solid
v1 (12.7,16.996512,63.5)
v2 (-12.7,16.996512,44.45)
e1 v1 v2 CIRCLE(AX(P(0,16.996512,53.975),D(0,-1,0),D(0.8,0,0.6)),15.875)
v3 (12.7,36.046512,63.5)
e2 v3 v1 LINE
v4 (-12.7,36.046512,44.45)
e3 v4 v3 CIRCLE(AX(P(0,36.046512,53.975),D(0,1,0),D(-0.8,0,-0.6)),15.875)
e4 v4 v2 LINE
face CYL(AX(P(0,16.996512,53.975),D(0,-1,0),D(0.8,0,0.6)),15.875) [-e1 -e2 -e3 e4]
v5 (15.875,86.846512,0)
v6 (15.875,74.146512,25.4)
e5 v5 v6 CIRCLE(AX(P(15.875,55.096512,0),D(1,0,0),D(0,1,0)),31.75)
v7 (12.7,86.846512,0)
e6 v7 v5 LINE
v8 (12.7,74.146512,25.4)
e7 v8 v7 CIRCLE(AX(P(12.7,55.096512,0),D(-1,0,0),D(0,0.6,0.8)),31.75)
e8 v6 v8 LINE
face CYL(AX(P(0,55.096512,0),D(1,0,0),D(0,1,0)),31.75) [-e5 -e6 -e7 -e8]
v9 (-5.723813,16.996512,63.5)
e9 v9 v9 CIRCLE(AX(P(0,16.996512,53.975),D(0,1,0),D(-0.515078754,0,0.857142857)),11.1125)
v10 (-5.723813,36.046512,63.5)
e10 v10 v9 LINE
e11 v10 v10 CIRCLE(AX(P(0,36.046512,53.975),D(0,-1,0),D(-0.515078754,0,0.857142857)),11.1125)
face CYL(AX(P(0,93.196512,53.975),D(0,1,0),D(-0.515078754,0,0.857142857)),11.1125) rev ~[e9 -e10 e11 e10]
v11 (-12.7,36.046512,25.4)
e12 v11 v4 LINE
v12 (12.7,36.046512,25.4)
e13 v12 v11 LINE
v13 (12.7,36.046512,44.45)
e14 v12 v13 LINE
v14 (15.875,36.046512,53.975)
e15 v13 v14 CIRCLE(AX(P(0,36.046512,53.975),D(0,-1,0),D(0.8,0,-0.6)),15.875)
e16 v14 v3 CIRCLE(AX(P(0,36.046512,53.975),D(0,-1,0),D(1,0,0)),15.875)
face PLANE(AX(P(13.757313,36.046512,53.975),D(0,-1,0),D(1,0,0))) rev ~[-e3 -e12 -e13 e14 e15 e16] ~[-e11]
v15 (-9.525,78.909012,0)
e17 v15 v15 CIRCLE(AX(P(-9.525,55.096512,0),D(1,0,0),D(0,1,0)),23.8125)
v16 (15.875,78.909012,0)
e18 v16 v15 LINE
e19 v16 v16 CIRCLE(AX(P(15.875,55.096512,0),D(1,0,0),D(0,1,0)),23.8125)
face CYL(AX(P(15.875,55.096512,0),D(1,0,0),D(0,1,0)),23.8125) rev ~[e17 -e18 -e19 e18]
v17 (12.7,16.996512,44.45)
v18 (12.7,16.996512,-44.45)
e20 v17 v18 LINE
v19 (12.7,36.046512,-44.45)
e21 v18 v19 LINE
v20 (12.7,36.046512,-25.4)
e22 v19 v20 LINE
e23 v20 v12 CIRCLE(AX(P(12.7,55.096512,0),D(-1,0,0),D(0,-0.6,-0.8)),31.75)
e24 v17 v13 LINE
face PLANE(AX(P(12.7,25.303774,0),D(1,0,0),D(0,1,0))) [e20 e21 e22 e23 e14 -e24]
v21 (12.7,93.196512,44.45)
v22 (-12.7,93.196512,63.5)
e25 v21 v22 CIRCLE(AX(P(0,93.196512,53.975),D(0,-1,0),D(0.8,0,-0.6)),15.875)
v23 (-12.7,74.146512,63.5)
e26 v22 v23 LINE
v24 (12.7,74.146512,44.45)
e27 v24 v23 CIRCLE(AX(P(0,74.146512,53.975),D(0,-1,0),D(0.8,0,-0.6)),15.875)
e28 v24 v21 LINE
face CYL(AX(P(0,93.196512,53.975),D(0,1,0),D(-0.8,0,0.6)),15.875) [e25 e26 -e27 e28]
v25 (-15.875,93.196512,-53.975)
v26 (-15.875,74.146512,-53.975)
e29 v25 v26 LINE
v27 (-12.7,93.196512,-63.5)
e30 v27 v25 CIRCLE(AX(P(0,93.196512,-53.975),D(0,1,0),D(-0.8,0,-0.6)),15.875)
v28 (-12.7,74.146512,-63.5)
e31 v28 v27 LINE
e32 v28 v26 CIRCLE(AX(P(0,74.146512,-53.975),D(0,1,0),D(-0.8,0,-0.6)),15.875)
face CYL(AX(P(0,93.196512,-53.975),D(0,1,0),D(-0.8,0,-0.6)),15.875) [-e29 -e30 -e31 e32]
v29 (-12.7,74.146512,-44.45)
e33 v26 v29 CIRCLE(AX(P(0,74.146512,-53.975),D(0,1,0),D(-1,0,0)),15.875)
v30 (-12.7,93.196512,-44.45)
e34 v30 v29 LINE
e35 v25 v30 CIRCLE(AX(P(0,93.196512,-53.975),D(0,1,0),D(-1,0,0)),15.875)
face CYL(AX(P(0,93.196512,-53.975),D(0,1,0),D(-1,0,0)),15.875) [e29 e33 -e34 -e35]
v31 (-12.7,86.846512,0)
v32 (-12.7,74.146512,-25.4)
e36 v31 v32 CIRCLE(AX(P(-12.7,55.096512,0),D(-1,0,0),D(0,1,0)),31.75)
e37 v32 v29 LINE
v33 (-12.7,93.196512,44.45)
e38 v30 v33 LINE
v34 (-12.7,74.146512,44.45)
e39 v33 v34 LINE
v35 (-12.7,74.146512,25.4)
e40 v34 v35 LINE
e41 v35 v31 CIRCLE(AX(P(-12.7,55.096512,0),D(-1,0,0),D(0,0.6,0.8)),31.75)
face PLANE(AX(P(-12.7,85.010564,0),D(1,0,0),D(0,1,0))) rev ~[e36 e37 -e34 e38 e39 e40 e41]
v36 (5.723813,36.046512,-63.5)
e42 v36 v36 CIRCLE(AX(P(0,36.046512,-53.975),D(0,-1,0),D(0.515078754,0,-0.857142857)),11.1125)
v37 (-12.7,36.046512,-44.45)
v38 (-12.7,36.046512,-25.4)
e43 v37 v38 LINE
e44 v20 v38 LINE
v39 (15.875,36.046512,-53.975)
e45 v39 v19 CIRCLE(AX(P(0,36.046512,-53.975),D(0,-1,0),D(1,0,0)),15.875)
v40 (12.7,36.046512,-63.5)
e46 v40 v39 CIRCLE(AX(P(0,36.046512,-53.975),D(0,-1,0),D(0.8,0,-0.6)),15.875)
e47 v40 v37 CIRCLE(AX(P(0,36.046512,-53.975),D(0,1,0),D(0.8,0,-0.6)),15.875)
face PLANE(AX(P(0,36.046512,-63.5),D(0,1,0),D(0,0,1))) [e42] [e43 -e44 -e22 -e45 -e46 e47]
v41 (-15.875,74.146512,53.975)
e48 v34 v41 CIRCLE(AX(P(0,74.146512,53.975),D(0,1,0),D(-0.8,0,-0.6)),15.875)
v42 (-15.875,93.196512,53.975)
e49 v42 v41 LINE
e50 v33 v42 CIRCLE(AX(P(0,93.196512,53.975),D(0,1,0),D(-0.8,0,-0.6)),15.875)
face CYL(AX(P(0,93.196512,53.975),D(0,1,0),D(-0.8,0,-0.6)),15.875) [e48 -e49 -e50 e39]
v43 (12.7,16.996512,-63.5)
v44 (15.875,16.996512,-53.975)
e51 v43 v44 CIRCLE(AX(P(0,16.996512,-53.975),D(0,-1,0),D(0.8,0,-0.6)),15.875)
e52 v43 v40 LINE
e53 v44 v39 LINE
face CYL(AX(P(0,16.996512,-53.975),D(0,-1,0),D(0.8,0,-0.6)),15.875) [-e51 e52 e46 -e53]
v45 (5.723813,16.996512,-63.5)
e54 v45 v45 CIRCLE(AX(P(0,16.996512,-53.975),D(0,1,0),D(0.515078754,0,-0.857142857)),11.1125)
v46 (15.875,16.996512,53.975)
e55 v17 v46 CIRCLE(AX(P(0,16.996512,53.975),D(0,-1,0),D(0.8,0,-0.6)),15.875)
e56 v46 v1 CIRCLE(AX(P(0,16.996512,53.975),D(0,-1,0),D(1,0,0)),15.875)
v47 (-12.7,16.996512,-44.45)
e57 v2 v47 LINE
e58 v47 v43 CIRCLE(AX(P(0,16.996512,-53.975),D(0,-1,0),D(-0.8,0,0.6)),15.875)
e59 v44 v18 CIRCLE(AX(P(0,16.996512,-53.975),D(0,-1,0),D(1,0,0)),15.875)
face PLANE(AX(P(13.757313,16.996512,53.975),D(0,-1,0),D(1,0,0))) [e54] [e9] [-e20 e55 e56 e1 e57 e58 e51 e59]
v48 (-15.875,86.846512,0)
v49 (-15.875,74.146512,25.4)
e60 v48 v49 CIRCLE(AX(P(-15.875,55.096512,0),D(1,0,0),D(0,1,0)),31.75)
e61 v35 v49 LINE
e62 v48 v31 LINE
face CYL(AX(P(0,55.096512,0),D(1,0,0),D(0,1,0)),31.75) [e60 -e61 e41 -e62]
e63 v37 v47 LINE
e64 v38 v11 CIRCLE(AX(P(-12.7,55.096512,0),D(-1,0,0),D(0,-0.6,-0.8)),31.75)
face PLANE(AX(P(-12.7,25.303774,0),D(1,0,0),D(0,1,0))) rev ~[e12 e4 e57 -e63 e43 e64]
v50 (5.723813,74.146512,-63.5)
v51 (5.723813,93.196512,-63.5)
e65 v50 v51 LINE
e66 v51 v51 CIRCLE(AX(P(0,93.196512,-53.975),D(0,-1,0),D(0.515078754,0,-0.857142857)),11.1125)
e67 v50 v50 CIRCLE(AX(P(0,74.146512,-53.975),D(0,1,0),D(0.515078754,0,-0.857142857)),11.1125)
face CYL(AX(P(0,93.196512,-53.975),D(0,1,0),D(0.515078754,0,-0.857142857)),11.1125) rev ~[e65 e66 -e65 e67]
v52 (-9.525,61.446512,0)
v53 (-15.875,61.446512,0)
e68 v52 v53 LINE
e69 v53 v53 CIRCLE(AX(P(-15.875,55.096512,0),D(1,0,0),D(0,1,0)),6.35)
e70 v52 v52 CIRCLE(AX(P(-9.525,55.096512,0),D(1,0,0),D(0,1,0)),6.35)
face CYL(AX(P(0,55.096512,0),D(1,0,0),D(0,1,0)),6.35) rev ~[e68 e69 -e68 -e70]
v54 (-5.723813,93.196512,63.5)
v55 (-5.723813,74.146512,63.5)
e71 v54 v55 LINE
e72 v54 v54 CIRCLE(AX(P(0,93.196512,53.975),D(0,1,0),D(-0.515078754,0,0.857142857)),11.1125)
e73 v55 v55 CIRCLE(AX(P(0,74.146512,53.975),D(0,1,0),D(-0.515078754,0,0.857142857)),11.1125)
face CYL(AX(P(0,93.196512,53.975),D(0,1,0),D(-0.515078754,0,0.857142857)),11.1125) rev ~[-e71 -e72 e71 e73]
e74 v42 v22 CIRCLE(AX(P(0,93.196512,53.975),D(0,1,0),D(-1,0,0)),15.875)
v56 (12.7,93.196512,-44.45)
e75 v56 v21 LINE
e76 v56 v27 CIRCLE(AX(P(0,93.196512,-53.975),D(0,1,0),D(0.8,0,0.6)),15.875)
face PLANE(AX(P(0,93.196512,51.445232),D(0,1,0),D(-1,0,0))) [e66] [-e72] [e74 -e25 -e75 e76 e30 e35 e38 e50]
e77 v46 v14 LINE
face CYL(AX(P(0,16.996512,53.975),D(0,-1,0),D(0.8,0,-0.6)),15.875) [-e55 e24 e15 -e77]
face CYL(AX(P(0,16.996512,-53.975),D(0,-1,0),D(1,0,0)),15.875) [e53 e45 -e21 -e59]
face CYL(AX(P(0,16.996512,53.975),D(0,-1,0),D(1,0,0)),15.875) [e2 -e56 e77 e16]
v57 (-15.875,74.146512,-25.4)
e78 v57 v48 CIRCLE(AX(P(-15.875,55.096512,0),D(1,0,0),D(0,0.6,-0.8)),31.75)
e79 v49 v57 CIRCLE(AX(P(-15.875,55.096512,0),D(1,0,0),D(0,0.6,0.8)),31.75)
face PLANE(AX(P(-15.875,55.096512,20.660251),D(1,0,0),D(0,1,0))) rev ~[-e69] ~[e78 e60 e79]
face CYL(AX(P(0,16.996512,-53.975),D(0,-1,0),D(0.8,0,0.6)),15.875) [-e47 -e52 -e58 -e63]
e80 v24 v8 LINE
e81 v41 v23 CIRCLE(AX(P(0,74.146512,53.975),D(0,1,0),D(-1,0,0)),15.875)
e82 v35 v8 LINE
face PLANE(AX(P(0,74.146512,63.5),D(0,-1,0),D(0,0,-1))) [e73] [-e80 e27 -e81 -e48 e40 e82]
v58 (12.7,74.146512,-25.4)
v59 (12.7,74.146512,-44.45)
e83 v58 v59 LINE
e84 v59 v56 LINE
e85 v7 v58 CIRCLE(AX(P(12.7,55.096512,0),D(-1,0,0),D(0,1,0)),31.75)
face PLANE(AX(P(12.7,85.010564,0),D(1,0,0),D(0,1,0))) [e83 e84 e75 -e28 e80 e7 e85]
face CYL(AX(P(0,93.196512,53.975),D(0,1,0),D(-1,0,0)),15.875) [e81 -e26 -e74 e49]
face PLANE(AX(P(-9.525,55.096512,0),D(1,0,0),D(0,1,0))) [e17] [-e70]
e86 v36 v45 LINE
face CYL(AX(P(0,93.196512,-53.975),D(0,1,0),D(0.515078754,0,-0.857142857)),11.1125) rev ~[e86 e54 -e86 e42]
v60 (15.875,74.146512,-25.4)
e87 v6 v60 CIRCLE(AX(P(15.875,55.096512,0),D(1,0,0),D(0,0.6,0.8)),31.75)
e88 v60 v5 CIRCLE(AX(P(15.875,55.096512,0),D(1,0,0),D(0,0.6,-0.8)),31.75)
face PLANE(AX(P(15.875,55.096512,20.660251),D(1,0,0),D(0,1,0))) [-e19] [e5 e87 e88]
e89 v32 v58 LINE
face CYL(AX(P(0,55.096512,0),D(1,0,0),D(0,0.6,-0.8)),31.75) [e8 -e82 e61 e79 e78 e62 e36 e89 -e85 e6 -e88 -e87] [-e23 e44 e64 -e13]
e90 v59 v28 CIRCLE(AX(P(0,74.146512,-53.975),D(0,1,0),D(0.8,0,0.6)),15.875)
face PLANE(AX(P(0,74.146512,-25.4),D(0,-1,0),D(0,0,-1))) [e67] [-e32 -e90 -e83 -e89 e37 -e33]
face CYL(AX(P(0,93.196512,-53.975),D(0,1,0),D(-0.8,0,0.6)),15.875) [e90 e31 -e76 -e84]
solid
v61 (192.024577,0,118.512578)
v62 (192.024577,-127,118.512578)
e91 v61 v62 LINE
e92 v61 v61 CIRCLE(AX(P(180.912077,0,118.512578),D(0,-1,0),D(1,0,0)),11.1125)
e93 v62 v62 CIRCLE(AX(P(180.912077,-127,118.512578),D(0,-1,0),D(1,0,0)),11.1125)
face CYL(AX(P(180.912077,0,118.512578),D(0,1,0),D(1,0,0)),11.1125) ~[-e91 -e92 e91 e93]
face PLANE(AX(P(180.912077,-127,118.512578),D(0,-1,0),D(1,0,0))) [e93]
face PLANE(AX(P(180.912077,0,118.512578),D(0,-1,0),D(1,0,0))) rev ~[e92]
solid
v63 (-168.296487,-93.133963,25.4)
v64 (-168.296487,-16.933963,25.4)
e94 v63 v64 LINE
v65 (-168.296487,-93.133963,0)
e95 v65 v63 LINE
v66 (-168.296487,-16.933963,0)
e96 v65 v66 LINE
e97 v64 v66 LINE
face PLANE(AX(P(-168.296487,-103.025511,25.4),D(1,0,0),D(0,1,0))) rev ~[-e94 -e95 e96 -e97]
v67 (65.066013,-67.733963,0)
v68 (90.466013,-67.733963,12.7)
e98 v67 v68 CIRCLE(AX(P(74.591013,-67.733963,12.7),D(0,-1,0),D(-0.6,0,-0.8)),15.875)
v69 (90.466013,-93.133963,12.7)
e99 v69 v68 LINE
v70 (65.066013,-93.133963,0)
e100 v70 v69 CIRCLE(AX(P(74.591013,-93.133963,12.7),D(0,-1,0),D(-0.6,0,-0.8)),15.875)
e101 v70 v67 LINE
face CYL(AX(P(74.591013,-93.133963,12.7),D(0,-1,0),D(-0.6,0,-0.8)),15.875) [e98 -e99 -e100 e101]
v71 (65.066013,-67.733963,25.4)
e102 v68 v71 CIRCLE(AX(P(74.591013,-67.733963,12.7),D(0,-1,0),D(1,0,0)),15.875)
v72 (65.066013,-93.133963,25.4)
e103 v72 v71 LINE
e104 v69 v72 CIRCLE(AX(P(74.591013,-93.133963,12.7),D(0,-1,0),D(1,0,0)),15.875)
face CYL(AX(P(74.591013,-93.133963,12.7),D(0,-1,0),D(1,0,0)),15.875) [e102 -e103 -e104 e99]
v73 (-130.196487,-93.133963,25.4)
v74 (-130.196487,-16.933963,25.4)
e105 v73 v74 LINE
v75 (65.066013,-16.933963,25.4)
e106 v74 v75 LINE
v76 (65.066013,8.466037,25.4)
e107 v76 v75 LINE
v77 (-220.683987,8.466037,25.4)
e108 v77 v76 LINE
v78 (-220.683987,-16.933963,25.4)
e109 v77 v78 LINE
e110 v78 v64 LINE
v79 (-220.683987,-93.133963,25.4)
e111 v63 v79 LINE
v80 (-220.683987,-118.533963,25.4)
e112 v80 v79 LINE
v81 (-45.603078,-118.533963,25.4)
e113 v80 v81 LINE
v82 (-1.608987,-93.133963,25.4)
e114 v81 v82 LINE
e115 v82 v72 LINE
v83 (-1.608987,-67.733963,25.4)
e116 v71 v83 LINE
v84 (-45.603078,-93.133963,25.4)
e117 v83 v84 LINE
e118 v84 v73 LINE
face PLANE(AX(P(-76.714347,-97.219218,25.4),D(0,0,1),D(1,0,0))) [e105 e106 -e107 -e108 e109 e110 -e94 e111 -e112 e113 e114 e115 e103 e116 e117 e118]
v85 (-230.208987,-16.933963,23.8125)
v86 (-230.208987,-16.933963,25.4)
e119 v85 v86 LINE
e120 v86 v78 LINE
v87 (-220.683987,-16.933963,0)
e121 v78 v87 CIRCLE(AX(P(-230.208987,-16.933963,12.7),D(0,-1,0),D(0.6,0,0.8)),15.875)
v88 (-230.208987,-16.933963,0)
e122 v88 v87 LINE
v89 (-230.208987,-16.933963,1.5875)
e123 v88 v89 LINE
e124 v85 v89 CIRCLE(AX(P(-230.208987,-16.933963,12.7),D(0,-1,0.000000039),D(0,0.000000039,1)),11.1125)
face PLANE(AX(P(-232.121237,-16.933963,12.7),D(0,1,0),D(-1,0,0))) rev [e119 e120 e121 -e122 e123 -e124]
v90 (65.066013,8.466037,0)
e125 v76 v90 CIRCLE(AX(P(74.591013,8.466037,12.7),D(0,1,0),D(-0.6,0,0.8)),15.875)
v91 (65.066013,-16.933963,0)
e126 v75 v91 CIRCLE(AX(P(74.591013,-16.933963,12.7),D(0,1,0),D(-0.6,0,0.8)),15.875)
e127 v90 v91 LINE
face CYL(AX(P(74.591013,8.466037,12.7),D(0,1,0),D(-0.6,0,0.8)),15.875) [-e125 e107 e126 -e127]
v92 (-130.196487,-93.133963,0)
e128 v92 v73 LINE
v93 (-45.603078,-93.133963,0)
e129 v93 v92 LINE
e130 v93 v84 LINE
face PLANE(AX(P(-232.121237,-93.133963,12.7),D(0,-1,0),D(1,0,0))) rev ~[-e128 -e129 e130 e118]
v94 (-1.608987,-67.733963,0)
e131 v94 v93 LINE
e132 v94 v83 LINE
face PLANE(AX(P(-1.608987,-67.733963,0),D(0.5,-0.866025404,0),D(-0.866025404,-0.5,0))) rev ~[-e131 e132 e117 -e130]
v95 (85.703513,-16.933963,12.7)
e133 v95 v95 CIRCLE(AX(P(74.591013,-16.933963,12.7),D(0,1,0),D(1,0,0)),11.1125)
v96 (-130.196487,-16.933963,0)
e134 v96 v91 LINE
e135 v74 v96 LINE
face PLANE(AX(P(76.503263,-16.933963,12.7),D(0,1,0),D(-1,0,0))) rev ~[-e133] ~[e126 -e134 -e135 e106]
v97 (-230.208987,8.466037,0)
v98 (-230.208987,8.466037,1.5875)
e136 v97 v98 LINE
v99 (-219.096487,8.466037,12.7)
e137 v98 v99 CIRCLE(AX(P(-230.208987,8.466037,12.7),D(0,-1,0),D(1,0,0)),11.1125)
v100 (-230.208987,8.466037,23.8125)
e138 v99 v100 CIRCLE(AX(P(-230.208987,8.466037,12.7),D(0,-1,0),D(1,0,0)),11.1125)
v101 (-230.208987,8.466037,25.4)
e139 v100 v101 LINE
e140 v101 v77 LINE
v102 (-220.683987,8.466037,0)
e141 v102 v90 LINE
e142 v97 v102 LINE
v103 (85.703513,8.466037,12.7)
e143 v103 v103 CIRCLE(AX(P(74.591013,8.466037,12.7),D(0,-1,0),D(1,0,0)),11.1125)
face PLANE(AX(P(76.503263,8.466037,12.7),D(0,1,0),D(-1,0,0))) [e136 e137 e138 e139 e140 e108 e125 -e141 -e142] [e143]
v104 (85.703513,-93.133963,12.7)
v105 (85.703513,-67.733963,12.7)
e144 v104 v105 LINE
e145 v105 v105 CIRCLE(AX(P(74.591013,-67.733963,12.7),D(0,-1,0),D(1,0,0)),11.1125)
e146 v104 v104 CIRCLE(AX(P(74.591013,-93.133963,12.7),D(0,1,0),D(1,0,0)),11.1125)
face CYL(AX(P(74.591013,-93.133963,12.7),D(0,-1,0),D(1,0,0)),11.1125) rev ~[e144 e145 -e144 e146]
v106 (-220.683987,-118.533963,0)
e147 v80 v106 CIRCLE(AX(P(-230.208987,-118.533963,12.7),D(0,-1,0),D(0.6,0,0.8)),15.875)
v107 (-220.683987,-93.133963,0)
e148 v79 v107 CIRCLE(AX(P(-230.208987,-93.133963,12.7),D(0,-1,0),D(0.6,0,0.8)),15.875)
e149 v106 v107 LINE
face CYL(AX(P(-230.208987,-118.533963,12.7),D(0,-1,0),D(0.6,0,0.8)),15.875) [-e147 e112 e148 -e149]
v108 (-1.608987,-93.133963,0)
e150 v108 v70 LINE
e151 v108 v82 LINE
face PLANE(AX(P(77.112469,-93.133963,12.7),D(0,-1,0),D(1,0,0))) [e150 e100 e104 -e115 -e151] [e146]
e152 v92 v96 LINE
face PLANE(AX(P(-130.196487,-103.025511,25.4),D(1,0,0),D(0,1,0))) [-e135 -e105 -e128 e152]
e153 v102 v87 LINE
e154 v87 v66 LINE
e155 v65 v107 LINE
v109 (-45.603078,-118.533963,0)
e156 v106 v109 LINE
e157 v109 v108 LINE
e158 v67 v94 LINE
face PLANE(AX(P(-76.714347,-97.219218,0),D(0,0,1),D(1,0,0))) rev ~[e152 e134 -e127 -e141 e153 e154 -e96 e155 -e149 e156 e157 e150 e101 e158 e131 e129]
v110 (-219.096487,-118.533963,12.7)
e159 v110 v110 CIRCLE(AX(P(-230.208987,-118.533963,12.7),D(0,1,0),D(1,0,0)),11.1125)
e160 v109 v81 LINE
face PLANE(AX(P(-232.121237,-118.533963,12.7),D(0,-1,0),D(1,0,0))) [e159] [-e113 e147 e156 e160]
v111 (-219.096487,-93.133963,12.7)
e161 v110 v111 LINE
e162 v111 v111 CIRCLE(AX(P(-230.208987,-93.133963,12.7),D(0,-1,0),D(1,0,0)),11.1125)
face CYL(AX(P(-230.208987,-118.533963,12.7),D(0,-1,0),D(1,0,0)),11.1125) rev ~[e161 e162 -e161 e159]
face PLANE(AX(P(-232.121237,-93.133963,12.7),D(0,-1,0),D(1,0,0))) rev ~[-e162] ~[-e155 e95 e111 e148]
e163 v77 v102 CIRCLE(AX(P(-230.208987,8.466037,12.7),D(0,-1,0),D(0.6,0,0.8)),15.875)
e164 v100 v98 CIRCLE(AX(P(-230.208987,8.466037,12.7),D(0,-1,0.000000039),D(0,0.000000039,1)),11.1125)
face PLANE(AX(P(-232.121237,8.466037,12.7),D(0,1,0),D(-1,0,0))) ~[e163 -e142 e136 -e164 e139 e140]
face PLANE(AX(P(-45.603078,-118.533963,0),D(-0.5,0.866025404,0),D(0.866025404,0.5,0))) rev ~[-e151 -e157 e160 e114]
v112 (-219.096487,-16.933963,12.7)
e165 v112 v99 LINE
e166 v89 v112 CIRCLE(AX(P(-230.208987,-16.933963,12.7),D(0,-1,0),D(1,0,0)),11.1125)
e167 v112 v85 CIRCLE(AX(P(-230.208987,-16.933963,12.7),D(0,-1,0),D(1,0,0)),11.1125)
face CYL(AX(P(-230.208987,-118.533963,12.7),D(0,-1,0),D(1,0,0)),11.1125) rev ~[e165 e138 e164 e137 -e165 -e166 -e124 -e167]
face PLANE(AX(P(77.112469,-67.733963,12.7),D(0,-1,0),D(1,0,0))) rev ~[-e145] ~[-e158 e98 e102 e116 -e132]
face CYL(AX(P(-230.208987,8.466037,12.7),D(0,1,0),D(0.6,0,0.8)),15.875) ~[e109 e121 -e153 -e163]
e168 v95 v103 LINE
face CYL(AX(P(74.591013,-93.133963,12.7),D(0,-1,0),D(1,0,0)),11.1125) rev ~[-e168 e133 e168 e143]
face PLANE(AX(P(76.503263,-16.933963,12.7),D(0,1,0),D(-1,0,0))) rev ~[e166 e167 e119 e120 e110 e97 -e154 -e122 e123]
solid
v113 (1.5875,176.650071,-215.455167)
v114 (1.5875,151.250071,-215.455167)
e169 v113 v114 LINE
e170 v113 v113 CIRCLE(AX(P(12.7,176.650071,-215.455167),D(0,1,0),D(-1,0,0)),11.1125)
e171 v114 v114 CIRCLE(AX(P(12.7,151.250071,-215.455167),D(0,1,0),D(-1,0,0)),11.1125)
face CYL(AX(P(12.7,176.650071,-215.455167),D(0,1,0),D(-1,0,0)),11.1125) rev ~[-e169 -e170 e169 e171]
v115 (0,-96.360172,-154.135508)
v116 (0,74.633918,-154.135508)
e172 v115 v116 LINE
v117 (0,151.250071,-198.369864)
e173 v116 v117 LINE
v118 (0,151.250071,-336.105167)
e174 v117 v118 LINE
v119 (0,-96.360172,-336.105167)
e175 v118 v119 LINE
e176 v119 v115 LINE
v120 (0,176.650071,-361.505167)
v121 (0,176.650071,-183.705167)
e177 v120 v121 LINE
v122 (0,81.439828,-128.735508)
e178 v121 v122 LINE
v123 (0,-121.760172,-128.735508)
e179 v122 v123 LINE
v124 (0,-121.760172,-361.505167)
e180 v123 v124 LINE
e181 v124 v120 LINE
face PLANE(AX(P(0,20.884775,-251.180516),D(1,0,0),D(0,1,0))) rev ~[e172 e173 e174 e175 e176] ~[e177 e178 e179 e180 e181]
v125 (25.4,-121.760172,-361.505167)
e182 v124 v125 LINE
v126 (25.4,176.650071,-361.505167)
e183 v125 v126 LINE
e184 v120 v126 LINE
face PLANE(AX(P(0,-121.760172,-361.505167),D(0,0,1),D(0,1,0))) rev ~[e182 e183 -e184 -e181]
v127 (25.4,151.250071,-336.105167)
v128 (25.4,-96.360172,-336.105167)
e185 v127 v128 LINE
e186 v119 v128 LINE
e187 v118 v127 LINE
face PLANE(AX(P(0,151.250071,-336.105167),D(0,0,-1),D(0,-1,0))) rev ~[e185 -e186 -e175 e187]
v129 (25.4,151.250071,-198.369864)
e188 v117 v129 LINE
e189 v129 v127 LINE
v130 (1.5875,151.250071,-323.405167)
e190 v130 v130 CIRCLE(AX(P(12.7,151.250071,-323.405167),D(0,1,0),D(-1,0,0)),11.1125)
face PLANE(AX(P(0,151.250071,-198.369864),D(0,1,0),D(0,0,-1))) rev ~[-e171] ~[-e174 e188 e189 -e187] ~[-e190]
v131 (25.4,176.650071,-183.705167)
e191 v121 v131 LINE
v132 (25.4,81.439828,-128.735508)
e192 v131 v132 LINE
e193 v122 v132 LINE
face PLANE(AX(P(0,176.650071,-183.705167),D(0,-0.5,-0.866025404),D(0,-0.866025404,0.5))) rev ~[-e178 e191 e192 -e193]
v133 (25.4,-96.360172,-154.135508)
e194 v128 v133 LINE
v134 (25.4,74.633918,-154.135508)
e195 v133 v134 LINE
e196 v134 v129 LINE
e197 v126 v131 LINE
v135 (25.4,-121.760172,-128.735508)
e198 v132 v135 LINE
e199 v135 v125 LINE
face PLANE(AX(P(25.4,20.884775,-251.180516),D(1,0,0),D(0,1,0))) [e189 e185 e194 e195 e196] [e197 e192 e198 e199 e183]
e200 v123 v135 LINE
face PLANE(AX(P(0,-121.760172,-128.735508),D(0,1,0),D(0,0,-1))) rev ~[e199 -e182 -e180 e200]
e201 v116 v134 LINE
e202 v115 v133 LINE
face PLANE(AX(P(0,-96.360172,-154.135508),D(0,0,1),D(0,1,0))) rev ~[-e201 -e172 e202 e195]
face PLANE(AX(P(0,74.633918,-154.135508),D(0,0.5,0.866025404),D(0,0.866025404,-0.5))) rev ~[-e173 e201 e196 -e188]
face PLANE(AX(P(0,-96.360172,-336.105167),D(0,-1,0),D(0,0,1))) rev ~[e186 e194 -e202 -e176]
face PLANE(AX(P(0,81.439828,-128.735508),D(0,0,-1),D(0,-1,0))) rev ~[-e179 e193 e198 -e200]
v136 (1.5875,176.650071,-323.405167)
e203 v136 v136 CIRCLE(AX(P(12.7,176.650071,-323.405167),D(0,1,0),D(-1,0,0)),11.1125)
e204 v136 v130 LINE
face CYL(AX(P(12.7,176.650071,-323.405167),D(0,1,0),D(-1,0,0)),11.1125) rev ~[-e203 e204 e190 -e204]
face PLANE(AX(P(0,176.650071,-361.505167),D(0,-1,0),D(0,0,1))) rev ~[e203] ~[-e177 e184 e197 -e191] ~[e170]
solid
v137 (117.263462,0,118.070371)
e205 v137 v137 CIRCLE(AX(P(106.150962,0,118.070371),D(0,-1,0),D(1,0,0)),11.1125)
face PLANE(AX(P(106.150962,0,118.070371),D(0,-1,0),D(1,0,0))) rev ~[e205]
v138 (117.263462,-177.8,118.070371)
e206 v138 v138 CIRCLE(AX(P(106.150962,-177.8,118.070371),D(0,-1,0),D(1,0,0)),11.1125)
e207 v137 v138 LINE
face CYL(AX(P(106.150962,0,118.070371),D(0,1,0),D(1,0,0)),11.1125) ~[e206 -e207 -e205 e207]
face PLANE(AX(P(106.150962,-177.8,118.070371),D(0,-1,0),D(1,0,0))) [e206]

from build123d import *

# Parameters (mm, degrees)
F0_W      = 304.8
F0_H      = 25.4
F1_DEPTH  = 25.4
F4_DEPTH  = 25.4
F5_DEPTH  = 25.4
F7_DEPTH  = 25.4
F8_R      = 11.1125
F9_DEPTH  = 127.001
F10_R     = 11.1125
F11_DEPTH = 101.601
F12_R     = 11.1125
F13_DEPTH = 127.001
F14_W     = 38.1
F14_H     = 86.0915481232
F15_DEPTH = 25.4
F16_DEPTH = 25.4
F19_DEPTH = 12.7
F20_DEPTH = 12.7
F18_R     = 6.35
F21_DEPTH = 15.875
F23_DEPTH = 19.05
F24_DEPTH = 211.7314750923
F26_DEPTH = 19.05
F27_R     = 23.8125
F28_DEPTH = 25.4
F29_R     = 11.1125
F30_DEPTH = 127
F33_DEPTH = 25.4
F34_R     = 11.1125
F35_DEPTH = 25.4
F31_R     = 11.1125
F36_DEPTH = 177.8


# Not quite as in the source:
# - a pattern or mirror of a feature is missing from the dataset's text; its kind, count and spacing are read off the source's solid


with BuildPart() as f1:
    # F0 (on Top) → F1 (new body)
    with BuildSketch(Plane.XY):
        with Locations((-77.8089873464, -4.2339627839)):
            Rectangle(F0_W, F0_H)
    extrude(amount=F1_DEPTH)



with BuildPart() as f1b:
    # F0 (on Top) → F1, piece 2 (new body)
    with BuildSketch(Plane.XY):
        Polygon((-230.2089873464, -93.1339627839), (-230.2089873464, -118.5339627839), (-45.6030778587, -118.5339627839), (-1.6089873464, -93.1339627839), (74.5910126536, -93.1339627839), (74.5910126536, -67.7339627839), (-1.6089873464, -67.7339627839), (-45.6030778587, -93.1339627839), align=None)
    extrude(amount=F1_DEPTH)

    # F2 (on face) → F4 (join)
    with BuildSketch(Plane.XZ.offset(118.5339627839)):
        with BuildLine():
            Line((-230.2089873464, 25.4), (-220.6839873464, 25.4))
            ThreePointArc((-220.6839873464, 25.4), (-246.0839873464, 12.7), (-220.6839873464, 0))
            Line((-220.6839873464, 0), (-230.2089873464, 0))
            Line((-230.2089873464, 0), (-230.2089873464, 25.4))
        make_face()
    f4 = extrude(amount=-F4_DEPTH)

    # F4_copies: F4 across plane
    add(f4.mirror(Plane.ZX.offset(-55.033963)))

    # F3 (on face) → F5 (join)
    with BuildSketch(Plane.XZ.offset(93.1339627839)):
        with BuildLine():
            ThreePointArc((65.0660126536, 0), (81.6905284821, -1.4990316571), (90.4660126536, 12.7))
            ThreePointArc((90.4660126536, 12.7), (81.6905284821, 26.8990316571), (65.0660126536, 25.4))
            Line((65.0660126536, 25.4), (74.5910126536, 25.4))
            Line((74.5910126536, 25.4), (74.5910126536, 0))
            Line((74.5910126536, 0), (65.0660126536, 0))
        make_face()
        with BuildLine():
            Line((74.5910126536, 25.4), (65.0660126536, 25.4))
            ThreePointArc((65.0660126536, 25.4), (58.7160126536, 12.7), (65.0660126536, 0))
            Line((65.0660126536, 0), (74.5910126536, 0))
            Line((74.5910126536, 0), (74.5910126536, 25.4))
        make_face()
    extrude(amount=-F5_DEPTH)


with BuildPart() as f1_1:
    add(f1.part)

    add(f1b.part)  # F7 merges F1b
    # F6 (on face) → F7 (join)
    with BuildSketch(Plane(origin=(0, 8.4660372161, 0), x_dir=(-1, 0, 0), z_dir=(0, 1, 0))):
        with BuildLine():
            Line((-74.5910126536, 25.4), (-65.0660126536, 25.4))
            ThreePointArc((-65.0660126536, 25.4), (-90.4660126536, 12.7), (-65.0660126536, 0))
            Line((-65.0660126536, 0), (-74.5910126536, 0))
            Line((-74.5910126536, 0), (-74.5910126536, 25.4))
        make_face()
        with BuildLine():
            Line((230.2089873464, 25.4), (220.6839873464, 25.4))
            ThreePointArc((220.6839873464, 25.4), (214.3339873464, 12.7), (220.6839873464, 0))
            Line((220.6839873464, 0), (230.2089873464, 0))
            Line((230.2089873464, 0), (230.2089873464, 25.4))
        make_face()
    extrude(amount=-F7_DEPTH)

    # F8 (on face) → F9 (cut, through all)
    with BuildSketch(Plane.XZ.offset(118.5339627839)):
        with Locations((-230.2089873464, 12.7)):
            Circle(F8_R)
    extrude(amount=-F9_DEPTH, mode=Mode.SUBTRACT)

    # F10 (on face) → F11 (cut, through all)
    with BuildSketch(Plane.XZ.offset(93.1339627839)):
        with Locations((74.5910126536, 12.7)):
            Circle(F10_R)
    extrude(amount=-F11_DEPTH, mode=Mode.SUBTRACT)

    # F12 (on face) → F13 (cut, through all)
    with BuildSketch(Plane(origin=(0, 8.4660372161, 0), x_dir=(-1, 0, 0), z_dir=(0, 1, 0))):
        with Locations((-74.5910126536, 12.7)):
            Circle(F12_R)
        with BuildLine():
            ThreePointArc((230.2089873464, 1.5875), (238.0667114524, 4.8422758941), (241.3214873464, 12.7))
            ThreePointArc((241.3214873464, 12.7), (238.0667114524, 20.5577241059), (230.2089873464, 23.8125))
            ThreePointArc((230.2089873464, 23.8125), (222.3512632405, 20.5577241059), (219.0964873464, 12.7))
            ThreePointArc((219.0964873464, 12.7), (222.3512632405, 4.8422758941), (230.2089873464, 1.5875))
        make_face()
    extrude(amount=-F13_DEPTH, mode=Mode.SUBTRACT)

    # F14 (on face) → F15 (join)
    with BuildSketch(Plane.XY.offset(25.4)):
        with Locations((-149.2464873464, -59.9797368456)):
            Rectangle(F14_W, F14_H)
    extrude(amount=-F15_DEPTH)


with BuildPart() as f16:
    # F16 (new): a face of the model
    f16_faces = [f1_1.part.faces().sort_by_distance(p)[0] for p in [
        (-168.2964873464, -55.0339627839, 12.7),
    ]]
    extrude(f16_faces, amount=F16_DEPTH)


with BuildPart() as f19:
    # F18 (on Right) → F19 (new body, symmetric)
    with BuildSketch(Plane.YZ):
        with BuildLine():
            Line((36.0465123084, 63.5), (16.9965123084, 63.5))
            Line((16.9965123084, 63.5), (16.9965123084, -63.5))
            Line((16.9965123084, -63.5), (36.0465123084, -63.5))
            Line((36.0465123084, -63.5), (36.0465123084, -25.4))
            ThreePointArc((36.0465123084, -25.4), (23.3465123084, 0), (36.0465123084, 25.4))
            Line((36.0465123084, 25.4), (36.0465123084, 63.5))
        make_face()
    extrude(amount=F19_DEPTH, both=True)



with BuildPart() as f20:
    # F18 (on Right) → F20 (new body, symmetric)
    with BuildSketch(Plane.YZ):
        with BuildLine():
            Line((74.1465123084, 63.5), (74.1465123084, 25.4))
            ThreePointArc((74.1465123084, 25.4), (83.4945756227, 14.1990316571), (86.8465123084, 0))
            ThreePointArc((86.8465123084, 0), (83.4945756227, -14.1990316571), (74.1465123084, -25.4))
            Line((74.1465123084, -25.4), (74.1465123084, -63.5))
            Line((74.1465123084, -63.5), (93.1965123084, -63.5))
            Line((93.1965123084, -63.5), (93.1965123084, 63.5))
            Line((93.1965123084, 63.5), (74.1465123084, 63.5))
        make_face()
    extrude(amount=F20_DEPTH, both=True)


with BuildPart() as f19_1:
    add(f19.part)

    add(f20.part)  # F21 merges F20
    # F18 (on Right) → F21 (join, symmetric)
    with BuildSketch(Plane.YZ):
        with BuildLine():
            ThreePointArc((74.1465123084, 25.4), (55.0965123084, 31.75), (36.0465123084, 25.4))
            Line((36.0465123084, 25.4), (36.0465123084, 12.7))
            Line((36.0465123084, 12.7), (74.1465123084, 12.7))
            Line((74.1465123084, 12.7), (74.1465123084, 25.4))
        make_face()
        with BuildLine():
            Line((36.0465123084, 12.7), (36.0465123084, 25.4))
            ThreePointArc((36.0465123084, 25.4), (23.3465123084, 0), (36.0465123084, -25.4))
            Line((36.0465123084, -25.4), (36.0465123084, -12.7))
            Line((36.0465123084, -12.7), (74.1465123084, -12.7))
            Line((74.1465123084, -12.7), (74.1465123084, -25.4))
            ThreePointArc((74.1465123084, -25.4), (83.4945756227, -14.1990316571), (86.8465123084, 0))
            ThreePointArc((86.8465123084, 0), (83.4945756227, 14.1990316571), (74.1465123084, 25.4))
            Line((74.1465123084, 25.4), (74.1465123084, 12.7))
            Line((74.1465123084, 12.7), (36.0465123084, 12.7))
        make_face()
        with Locations((55.0965123084, 0)):
            Circle(F18_R, mode=Mode.SUBTRACT)
        with BuildLine():
            Line((36.0465123084, -12.7), (36.0465123084, -25.4))
            ThreePointArc((36.0465123084, -25.4), (55.0965123084, -31.75), (74.1465123084, -25.4))
            Line((74.1465123084, -25.4), (74.1465123084, -12.7))
            Line((74.1465123084, -12.7), (36.0465123084, -12.7))
        make_face()
        with BuildLine():
            ThreePointArc((74.1465123084, 25.4), (55.0965123084, 31.75), (36.0465123084, 25.4))
            Line((36.0465123084, 25.4), (36.0465123084, 12.7))
            Line((36.0465123084, 12.7), (74.1465123084, 12.7))
            Line((74.1465123084, 12.7), (74.1465123084, 25.4))
        make_face()
        with BuildLine():
            Line((36.0465123084, 12.7), (36.0465123084, 25.4))
            ThreePointArc((36.0465123084, 25.4), (23.3465123084, 0), (36.0465123084, -25.4))
            Line((36.0465123084, -25.4), (36.0465123084, -12.7))
            Line((36.0465123084, -12.7), (74.1465123084, -12.7))
            Line((74.1465123084, -12.7), (74.1465123084, -25.4))
            ThreePointArc((74.1465123084, -25.4), (83.4945756227, -14.1990316571), (86.8465123084, 0))
            ThreePointArc((86.8465123084, 0), (83.4945756227, 14.1990316571), (74.1465123084, 25.4))
            Line((74.1465123084, 25.4), (74.1465123084, 12.7))
            Line((74.1465123084, 12.7), (36.0465123084, 12.7))
        make_face()
        with Locations((55.0965123084, 0)):
            Circle(F18_R, mode=Mode.SUBTRACT)
        with BuildLine():
            Line((36.0465123084, -12.7), (36.0465123084, -25.4))
            ThreePointArc((36.0465123084, -25.4), (55.0965123084, -31.75), (74.1465123084, -25.4))
            Line((74.1465123084, -25.4), (74.1465123084, -12.7))
            Line((74.1465123084, -12.7), (36.0465123084, -12.7))
        make_face()
        with BuildLine():
            Line((36.0465123084, 12.7), (36.0465123084, 25.4))
            ThreePointArc((36.0465123084, 25.4), (23.3465123084, 0), (36.0465123084, -25.4))
            Line((36.0465123084, -25.4), (36.0465123084, -12.7))
            Line((36.0465123084, -12.7), (74.1465123084, -12.7))
            Line((74.1465123084, -12.7), (74.1465123084, -25.4))
            ThreePointArc((74.1465123084, -25.4), (83.4945756227, -14.1990316571), (86.8465123084, 0))
            ThreePointArc((86.8465123084, 0), (83.4945756227, 14.1990316571), (74.1465123084, 25.4))
            Line((74.1465123084, 25.4), (74.1465123084, 12.7))
            Line((74.1465123084, 12.7), (36.0465123084, 12.7))
        make_face()
        with Locations((55.0965123084, 0)):
            Circle(F18_R, mode=Mode.SUBTRACT)
    extrude(amount=F21_DEPTH, both=True)

    # F22 (on face) → F23 (join)
    with BuildSketch(Plane(origin=(0, 93.1965123084, 0), x_dir=(-1, 0, 0), z_dir=(0, 1, 0))):
        with BuildLine():
            Line((12.7, 44.45), (12.7, 63.5))
            Line((12.7, 63.5), (5.7238126498, 63.5))
            ThreePointArc((5.7238126498, 63.5), (9.6719575144, 59.4468273081), (11.1125, 53.975))
            ThreePointArc((11.1125, 53.975), (-5.4718273081, 44.3030424856), (-5.7238126498, 63.5))
            Line((-5.7238126498, 63.5), (-12.7, 63.5))
            Line((-12.7, 63.5), (-12.7, 44.45))
            ThreePointArc((-12.7, 44.45), (0, 38.1), (12.7, 44.45))
        make_face()
        with BuildLine():
            Line((-12.7, 44.45), (-12.7, 63.5))
            ThreePointArc((-12.7, 63.5), (-15.875, 53.975), (-12.7, 44.45))
        make_face()
        with BuildLine():
            ThreePointArc((12.7, 44.45), (15.0603473566, 48.9548842145), (15.875, 53.975))
            ThreePointArc((15.875, 53.975), (15.0603473566, 58.9951157855), (12.7, 63.5))
            Line((12.7, 63.5), (12.7, 44.45))
        make_face()
        with BuildLine():
            Line((5.7238126498, 63.5), (12.7, 63.5))
            ThreePointArc((12.7, 63.5), (0, 69.85), (-12.7, 63.5))
            Line((-12.7, 63.5), (-5.7238126498, 63.5))
            ThreePointArc((-5.7238126498, 63.5), (0, 65.0875), (5.7238126498, 63.5))
        make_face()
        with BuildLine():
            Line((-5.7238126498, 63.5), (5.7238126498, 63.5))
            ThreePointArc((5.7238126498, 63.5), (0, 65.0875), (-5.7238126498, 63.5))
        make_face()
        with BuildLine():
            ThreePointArc((15.875, -53.975), (15.0603473566, -48.9548842145), (12.7, -44.45))
            Line((12.7, -44.45), (12.7, -63.5))
            ThreePointArc((12.7, -63.5), (15.0603473566, -58.9951157855), (15.875, -53.975))
        make_face()
        with BuildLine():
            Line((12.7, -63.5), (12.7, -44.45))
            ThreePointArc((12.7, -44.45), (0, -38.1), (-12.7, -44.45))
            Line((-12.7, -44.45), (-12.7, -63.5))
            Line((-12.7, -63.5), (-5.7238126498, -63.5))
            ThreePointArc((-5.7238126498, -63.5), (-5.4718273081, -44.3030424856), (11.1125, -53.975))
            ThreePointArc((11.1125, -53.975), (9.6719575144, -59.4468273081), (5.7238126498, -63.5))
            Line((5.7238126498, -63.5), (12.7, -63.5))
        make_face()
        with BuildLine():
            ThreePointArc((-12.7, -63.5), (0, -69.85), (12.7, -63.5))
            Line((12.7, -63.5), (5.7238126498, -63.5))
            ThreePointArc((5.7238126498, -63.5), (0, -65.0875), (-5.7238126498, -63.5))
            Line((-5.7238126498, -63.5), (-12.7, -63.5))
        make_face()
        with BuildLine():
            Line((-12.7, -63.5), (-12.7, -44.45))
            ThreePointArc((-12.7, -44.45), (-15.875, -53.975), (-12.7, -63.5))
        make_face()
    extrude(amount=-F23_DEPTH)

    # F22 (on face) → F24 (cut, through all)
    with BuildSketch(Plane(origin=(0, 93.1965123084, 0), x_dir=(-1, 0, 0), z_dir=(0, 1, 0))):
        with BuildLine():
            ThreePointArc((11.1125, 53.975), (9.6719575144, 59.4468273081), (5.7238126498, 63.5))
            Line((5.7238126498, 63.5), (-5.7238126498, 63.5))
            ThreePointArc((-5.7238126498, 63.5), (-5.4718273081, 44.3030424856), (11.1125, 53.975))
        make_face()
        with BuildLine():
            Line((-5.7238126498, 63.5), (5.7238126498, 63.5))
            ThreePointArc((5.7238126498, 63.5), (0, 65.0875), (-5.7238126498, 63.5))
        make_face()
        with BuildLine():
            Line((-5.7238126498, -63.5), (5.7238126498, -63.5))
            ThreePointArc((5.7238126498, -63.5), (9.6719575144, -59.4468273081), (11.1125, -53.975))
            ThreePointArc((11.1125, -53.975), (-5.4718273081, -44.3030424856), (-5.7238126498, -63.5))
        make_face()
        with BuildLine():
            ThreePointArc((-5.7238126498, -63.5), (0, -65.0875), (5.7238126498, -63.5))
            Line((5.7238126498, -63.5), (-5.7238126498, -63.5))
        make_face()
    extrude(amount=-F24_DEPTH, mode=Mode.SUBTRACT)

    # F25 (on face) → F26 (join)
    with BuildSketch(Plane.XZ.offset(-16.9965123084)):
        with BuildLine():
            ThreePointArc((12.7, 44.45), (15.0603473566, 48.9548842145), (15.875, 53.975))
            ThreePointArc((15.875, 53.975), (15.0603473566, 58.9951157855), (12.7, 63.5))
            Line((12.7, 63.5), (12.7, 44.45))
        make_face()
        with BuildLine():
            Line((5.7238126498, 63.5), (12.7, 63.5))
            ThreePointArc((12.7, 63.5), (0, 69.85), (-12.7, 63.5))
            Line((-12.7, 63.5), (-5.7238126498, 63.5))
            ThreePointArc((-5.7238126498, 63.5), (0, 65.0875), (5.7238126498, 63.5))
        make_face()
        with BuildLine():
            Line((12.7, 44.45), (12.7, 63.5))
            Line((12.7, 63.5), (5.7238126498, 63.5))
            ThreePointArc((5.7238126498, 63.5), (9.6719575144, 59.4468273081), (11.1125, 53.975))
            ThreePointArc((11.1125, 53.975), (-5.4718273081, 44.3030424856), (-5.7238126498, 63.5))
            Line((-5.7238126498, 63.5), (-12.7, 63.5))
            Line((-12.7, 63.5), (-12.7, 44.45))
            ThreePointArc((-12.7, 44.45), (0, 38.1), (12.7, 44.45))
        make_face()
        with BuildLine():
            Line((-12.7, 44.45), (-12.7, 63.5))
            ThreePointArc((-12.7, 63.5), (-15.875, 53.975), (-12.7, 44.45))
        make_face()
        with BuildLine():
            Line((12.7, -63.5), (12.7, -44.45))
            ThreePointArc((12.7, -44.45), (0, -38.1), (-12.7, -44.45))
            Line((-12.7, -44.45), (-12.7, -63.5))
            Line((-12.7, -63.5), (-5.7238126498, -63.5))
            ThreePointArc((-5.7238126498, -63.5), (-5.4718273081, -44.3030424856), (11.1125, -53.975))
            ThreePointArc((11.1125, -53.975), (9.6719575144, -59.4468273081), (5.7238126498, -63.5))
            Line((5.7238126498, -63.5), (12.7, -63.5))
        make_face()
        with BuildLine():
            ThreePointArc((15.875, -53.975), (15.0603473566, -48.9548842145), (12.7, -44.45))
            Line((12.7, -44.45), (12.7, -63.5))
            ThreePointArc((12.7, -63.5), (15.0603473566, -58.9951157855), (15.875, -53.975))
        make_face()
        with BuildLine():
            Line((-12.7, -63.5), (-12.7, -44.45))
            ThreePointArc((-12.7, -44.45), (-15.875, -53.975), (-12.7, -63.5))
        make_face()
        with BuildLine():
            ThreePointArc((-12.7, -63.5), (0, -69.85), (12.7, -63.5))
            Line((12.7, -63.5), (5.7238126498, -63.5))
            ThreePointArc((5.7238126498, -63.5), (0, -65.0875), (-5.7238126498, -63.5))
            Line((-5.7238126498, -63.5), (-12.7, -63.5))
        make_face()
    extrude(amount=-F26_DEPTH)

    # F27 (on face) → F28 (cut)
    with BuildSketch(Plane.YZ.offset(15.875)):
        with Locations((55.0965123084, 0)):
            Circle(F27_R)
    extrude(amount=-F28_DEPTH, mode=Mode.SUBTRACT)


with BuildPart() as f30:
    # F29 (on Front) → F30 (new body)
    with BuildSketch(Plane.XZ):
        with Locations((180.9120774269, 118.5125783086)):
            Circle(F29_R)
    extrude(amount=F30_DEPTH)


with BuildPart() as f33:
    # F32 (on Right) → F33 (new body)
    with BuildSketch(Plane.YZ):
        Polygon((81.4398276971, -128.7355077243), (-121.7601723029, -128.7355077243), (-121.7601723029, -310.7051673555), (-121.7601723029, -361.5051673555), (176.6500710531, -361.5051673555), (176.6500710531, -183.7051673555), align=None)
        Polygon((-96.3601723029, -336.1051673555), (-96.3601723029, -154.1355077243), (74.6339182094, -154.1355077243), (151.2500710531, -198.3698641929), (151.2500710531, -336.1051673555), align=None, mode=Mode.SUBTRACT)
    extrude(amount=F33_DEPTH)

    # F34 (on face) → F35 (cut, through all)
    with BuildSketch(Plane(origin=(0, 176.6500710531, 0), x_dir=(-1, 0, 0), z_dir=(0, 1, 0))):
        with Locations((-12.7, -215.4551673555)):
            Circle(F34_R)
        with Locations((-12.7, -323.4051673555)):
            Circle(F34_R)
    extrude(amount=-F35_DEPTH, mode=Mode.SUBTRACT)


with BuildPart() as f36:
    # F31 (on Front) → F36 (new body)
    with BuildSketch(Plane.XZ):
        with Locations((106.1509624124, 118.070371449)):
            Circle(F31_R)
    extrude(amount=F36_DEPTH)


solid = Compound([f1_1.part, f19_1.part, f30.part, f33.part, f36.part])
